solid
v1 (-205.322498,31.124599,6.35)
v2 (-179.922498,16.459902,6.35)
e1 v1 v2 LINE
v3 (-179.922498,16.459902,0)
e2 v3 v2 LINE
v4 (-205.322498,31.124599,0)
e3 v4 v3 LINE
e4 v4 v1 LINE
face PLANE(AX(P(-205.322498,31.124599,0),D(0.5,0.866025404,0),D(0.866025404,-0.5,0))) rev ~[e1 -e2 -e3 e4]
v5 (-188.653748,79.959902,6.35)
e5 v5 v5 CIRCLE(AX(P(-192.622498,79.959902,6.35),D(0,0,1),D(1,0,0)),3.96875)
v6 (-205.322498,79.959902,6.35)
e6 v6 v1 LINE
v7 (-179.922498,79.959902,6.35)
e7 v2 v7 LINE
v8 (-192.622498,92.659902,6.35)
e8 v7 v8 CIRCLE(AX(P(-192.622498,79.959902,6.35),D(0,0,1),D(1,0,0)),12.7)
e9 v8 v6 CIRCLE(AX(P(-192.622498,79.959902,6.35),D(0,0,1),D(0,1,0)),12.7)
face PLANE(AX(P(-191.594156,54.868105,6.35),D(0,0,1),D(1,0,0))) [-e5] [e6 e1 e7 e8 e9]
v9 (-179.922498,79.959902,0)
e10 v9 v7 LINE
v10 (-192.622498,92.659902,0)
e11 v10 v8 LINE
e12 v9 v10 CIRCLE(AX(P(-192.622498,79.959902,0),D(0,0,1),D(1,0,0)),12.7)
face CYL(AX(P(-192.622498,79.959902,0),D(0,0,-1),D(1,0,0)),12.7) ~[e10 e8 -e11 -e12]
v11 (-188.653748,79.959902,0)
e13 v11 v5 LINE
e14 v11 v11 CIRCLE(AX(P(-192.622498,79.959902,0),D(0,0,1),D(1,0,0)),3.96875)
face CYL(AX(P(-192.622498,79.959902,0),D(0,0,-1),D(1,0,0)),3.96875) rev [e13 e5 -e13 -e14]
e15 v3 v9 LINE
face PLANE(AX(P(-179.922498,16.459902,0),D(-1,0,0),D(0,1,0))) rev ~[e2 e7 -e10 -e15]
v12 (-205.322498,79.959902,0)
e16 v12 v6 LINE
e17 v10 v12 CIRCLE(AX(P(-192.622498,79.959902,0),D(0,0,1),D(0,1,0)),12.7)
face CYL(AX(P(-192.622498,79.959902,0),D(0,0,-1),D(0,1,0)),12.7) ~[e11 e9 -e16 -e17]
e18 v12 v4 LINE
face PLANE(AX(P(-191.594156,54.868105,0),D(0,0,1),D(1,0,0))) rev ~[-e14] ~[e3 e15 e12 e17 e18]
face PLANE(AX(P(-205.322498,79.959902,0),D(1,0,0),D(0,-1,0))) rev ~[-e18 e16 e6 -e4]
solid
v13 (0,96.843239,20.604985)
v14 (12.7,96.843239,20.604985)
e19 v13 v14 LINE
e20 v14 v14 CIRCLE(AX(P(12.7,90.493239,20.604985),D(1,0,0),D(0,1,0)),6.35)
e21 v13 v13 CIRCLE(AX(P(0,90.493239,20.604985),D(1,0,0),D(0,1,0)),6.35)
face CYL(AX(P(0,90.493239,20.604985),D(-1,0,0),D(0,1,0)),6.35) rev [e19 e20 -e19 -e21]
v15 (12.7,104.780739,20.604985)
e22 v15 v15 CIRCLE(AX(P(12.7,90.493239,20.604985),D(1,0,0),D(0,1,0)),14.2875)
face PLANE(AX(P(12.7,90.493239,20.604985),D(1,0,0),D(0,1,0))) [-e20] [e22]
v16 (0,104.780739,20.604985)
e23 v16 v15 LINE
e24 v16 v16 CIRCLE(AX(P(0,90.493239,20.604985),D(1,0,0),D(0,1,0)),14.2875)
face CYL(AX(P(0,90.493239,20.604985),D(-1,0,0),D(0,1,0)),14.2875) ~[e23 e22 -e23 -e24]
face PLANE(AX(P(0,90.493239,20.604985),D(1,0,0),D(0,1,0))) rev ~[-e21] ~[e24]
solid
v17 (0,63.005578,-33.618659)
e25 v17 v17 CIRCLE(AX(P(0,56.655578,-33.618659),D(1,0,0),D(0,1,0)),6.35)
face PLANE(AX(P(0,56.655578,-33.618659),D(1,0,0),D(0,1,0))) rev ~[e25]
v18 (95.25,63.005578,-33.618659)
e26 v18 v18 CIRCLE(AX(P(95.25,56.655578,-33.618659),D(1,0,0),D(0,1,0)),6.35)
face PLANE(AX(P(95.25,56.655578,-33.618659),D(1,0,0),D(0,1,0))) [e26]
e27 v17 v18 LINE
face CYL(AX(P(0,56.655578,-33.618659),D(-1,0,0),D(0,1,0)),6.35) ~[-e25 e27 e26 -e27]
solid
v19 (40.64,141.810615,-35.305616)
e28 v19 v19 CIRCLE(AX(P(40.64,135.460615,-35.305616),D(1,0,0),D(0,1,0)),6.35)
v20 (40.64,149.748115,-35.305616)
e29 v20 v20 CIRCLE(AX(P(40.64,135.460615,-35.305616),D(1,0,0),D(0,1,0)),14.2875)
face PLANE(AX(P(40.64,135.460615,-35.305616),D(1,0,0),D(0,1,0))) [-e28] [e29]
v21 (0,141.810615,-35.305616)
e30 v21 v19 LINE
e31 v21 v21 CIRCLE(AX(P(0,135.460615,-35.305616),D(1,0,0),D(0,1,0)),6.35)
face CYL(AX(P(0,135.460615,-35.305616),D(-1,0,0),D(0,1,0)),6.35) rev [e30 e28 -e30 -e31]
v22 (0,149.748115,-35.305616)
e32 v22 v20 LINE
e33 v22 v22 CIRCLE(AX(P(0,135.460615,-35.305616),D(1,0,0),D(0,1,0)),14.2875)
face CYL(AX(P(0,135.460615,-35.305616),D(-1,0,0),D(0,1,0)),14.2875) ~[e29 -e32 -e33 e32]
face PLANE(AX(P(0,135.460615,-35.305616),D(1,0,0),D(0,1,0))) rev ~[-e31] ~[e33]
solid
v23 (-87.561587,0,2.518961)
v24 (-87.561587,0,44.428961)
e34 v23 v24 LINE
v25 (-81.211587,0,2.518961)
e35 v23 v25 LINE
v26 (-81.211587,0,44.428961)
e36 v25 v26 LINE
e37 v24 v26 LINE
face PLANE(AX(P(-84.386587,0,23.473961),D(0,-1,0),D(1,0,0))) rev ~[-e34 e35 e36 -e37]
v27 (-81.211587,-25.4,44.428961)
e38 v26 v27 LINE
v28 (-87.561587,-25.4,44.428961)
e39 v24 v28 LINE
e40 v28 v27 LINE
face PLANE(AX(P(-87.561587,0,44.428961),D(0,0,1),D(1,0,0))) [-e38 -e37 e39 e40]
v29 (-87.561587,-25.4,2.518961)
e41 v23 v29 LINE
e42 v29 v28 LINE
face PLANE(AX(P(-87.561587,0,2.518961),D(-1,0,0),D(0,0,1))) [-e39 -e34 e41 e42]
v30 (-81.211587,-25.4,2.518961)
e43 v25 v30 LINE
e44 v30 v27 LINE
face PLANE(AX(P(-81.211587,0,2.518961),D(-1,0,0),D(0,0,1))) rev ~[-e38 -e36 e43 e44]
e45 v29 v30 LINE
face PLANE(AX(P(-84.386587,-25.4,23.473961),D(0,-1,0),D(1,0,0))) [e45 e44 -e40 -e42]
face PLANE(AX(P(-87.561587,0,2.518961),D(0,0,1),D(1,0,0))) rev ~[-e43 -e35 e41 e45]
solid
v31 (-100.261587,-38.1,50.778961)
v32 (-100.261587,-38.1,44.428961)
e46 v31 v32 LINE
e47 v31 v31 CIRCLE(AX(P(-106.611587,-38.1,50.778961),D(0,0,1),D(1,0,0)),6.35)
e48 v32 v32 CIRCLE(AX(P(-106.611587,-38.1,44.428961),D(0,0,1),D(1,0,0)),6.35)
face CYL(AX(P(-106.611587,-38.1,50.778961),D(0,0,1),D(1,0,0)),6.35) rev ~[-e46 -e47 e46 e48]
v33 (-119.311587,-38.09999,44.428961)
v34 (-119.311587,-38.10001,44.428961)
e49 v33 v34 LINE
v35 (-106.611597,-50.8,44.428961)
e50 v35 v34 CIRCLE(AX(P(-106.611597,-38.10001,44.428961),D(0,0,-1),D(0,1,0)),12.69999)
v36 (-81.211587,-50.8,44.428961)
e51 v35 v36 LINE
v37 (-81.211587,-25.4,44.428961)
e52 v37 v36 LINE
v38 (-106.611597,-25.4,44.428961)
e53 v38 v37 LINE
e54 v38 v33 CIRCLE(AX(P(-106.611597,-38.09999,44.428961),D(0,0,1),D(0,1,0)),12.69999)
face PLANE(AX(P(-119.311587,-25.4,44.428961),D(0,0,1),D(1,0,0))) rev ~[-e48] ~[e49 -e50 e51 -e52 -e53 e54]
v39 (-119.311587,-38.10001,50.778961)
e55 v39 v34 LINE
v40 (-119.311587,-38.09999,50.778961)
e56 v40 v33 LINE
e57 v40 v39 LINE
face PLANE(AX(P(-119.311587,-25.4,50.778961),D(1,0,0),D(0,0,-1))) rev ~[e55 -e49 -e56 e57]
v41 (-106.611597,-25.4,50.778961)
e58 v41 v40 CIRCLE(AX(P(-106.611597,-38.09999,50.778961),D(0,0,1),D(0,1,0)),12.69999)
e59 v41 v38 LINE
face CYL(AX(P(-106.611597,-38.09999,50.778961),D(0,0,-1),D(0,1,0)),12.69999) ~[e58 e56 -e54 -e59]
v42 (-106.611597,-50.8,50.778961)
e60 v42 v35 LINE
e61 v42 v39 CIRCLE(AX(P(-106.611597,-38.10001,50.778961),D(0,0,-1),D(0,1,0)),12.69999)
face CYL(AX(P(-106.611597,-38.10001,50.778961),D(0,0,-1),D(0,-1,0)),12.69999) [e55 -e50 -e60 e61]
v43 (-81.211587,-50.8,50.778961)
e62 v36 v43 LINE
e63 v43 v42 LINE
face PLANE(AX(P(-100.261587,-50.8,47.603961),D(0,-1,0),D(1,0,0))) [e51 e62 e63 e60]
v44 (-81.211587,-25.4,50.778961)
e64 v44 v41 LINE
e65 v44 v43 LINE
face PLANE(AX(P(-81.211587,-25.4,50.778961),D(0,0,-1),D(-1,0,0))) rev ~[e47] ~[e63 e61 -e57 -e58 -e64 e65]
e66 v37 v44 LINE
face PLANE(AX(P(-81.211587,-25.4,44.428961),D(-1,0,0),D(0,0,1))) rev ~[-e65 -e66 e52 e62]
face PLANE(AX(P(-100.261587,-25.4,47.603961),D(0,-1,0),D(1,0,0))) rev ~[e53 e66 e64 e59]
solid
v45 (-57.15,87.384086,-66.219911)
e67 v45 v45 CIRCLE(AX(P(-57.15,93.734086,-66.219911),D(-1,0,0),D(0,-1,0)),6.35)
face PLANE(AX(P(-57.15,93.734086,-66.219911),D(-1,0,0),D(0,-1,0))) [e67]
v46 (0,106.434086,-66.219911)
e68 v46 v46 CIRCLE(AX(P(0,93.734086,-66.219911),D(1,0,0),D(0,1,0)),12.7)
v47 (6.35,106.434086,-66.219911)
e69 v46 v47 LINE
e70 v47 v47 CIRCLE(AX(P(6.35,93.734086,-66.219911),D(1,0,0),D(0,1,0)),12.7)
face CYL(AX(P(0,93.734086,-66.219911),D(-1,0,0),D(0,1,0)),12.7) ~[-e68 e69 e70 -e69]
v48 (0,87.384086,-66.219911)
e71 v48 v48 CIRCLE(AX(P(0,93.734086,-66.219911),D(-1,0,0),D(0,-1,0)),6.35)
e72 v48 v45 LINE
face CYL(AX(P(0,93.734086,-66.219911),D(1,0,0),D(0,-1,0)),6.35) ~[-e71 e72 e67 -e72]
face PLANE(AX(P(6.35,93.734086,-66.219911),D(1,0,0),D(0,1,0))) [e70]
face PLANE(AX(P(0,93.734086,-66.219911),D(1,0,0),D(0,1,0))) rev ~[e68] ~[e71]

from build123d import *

# Parameters (mm, degrees)
F0_W      = 6.35
F0_H      = 41.91
F1_DEPTH  = 25.4
F3_DEPTH  = 25.4
F4_R      = 6.35
F5_DEPTH  = 6.35
F6_R      = 14.2875
F6_R_2    = 6.35
F7_DEPTH  = 12.7
F8_R      = 6.35
F9_DEPTH  = 95.25
F10_R     = 14.2875
F10_R_2   = 6.35
F11_DEPTH = 40.64
F12_R     = 12.7
F13_DEPTH = 6.35
F14_R     = 6.35
F15_DEPTH = 57.15
F16_R     = 3.96875
F17_DEPTH = 6.35
F18_R     = 12.69999


# Not quite as in the source:
# - a fillet or chamfer is up to 0.001 mm smaller than in the source, because OpenCascade refuses the exact size


with BuildPart() as f1:
    # F0 (on Front) → F1 (new body)
    with BuildSketch(Plane.XZ):
        with Locations((-84.3865873288, 23.4739605102)):
            Rectangle(F0_W, F0_H)
    extrude(amount=F1_DEPTH)


with BuildPart() as f3:
    # F2 (on face) → F3 (new body)
    with BuildSketch(Plane.XZ.offset(25.4)):
        Polygon((-87.5615873288, 44.4289605102), (-81.2115873288, 44.4289605102), (-81.2115873288, 50.7789605102), (-119.3115873288, 50.7789605102), (-119.3115873288, 44.4289605102), align=None)
    extrude(amount=F3_DEPTH)

    # F4 (on face) → F5 (cut, through all)
    with BuildSketch(Plane.XY.offset(50.7789605102)):
        with Locations((-106.6115873288, -38.1)):
            Circle(F4_R)
    extrude(amount=-F5_DEPTH, mode=Mode.SUBTRACT)

    # F18 (radius 12.7 in the source; OpenCascade refuses exactly that, so slightly less here)
    f18_edges = [f3.edges().sort_by_distance(p)[0] for p in [
        (-119.311587, -50.8, 47.603961),
        (-119.311587, -25.4, 47.603961),
    ]]
    fillet(f18_edges, radius=F18_R)


with BuildPart() as f7:
    # F6 (on Right) → F7 (new body)
    with BuildSketch(Plane.YZ):
        with Locations((90.4932394624, 20.6049848348)):
            Circle(F6_R)
        with Locations((90.4932394624, 20.6049848348)):
            Circle(F6_R_2, mode=Mode.SUBTRACT)
    extrude(amount=F7_DEPTH)


with BuildPart() as f9:
    # F8 (on Right) → F9 (new body)
    with BuildSketch(Plane.YZ):
        with Locations((56.6555783153, -33.6186587811)):
            Circle(F8_R)
    extrude(amount=F9_DEPTH)


with BuildPart() as f11:
    # F10 (on Right) → F11 (new body)
    with BuildSketch(Plane.YZ):
        with Locations((135.4606151581, -35.3056155145)):
            Circle(F10_R)
        with Locations((135.4606151581, -35.3056155145)):
            Circle(F10_R_2, mode=Mode.SUBTRACT)
    extrude(amount=F11_DEPTH)


with BuildPart() as f13:
    # F12 (on Right) → F13 (new body)
    with BuildSketch(Plane.YZ):
        with Locations((93.7340855598, -66.2199109793)):
            Circle(F12_R)
    extrude(amount=F13_DEPTH)

    # F14 (on face) → F15 (join)
    with BuildSketch(Plane(origin=(0, 0, 0), x_dir=(0, -1, 0), z_dir=(-1, 0, 0))):
        with Locations((-93.7340855598, -66.2199109793)):
            Circle(F14_R)
    extrude(amount=F15_DEPTH)


with BuildPart() as f17:
    # F16 (on Top) → F17 (new body)
    with BuildSketch(Plane.XY):
        with BuildLine():
            Line((-179.9224981273, 16.4599019216), (-179.9224981273, 79.9599019216))
            ThreePointArc((-179.9224981273, 79.9599019216), (-183.6422420062, 88.9401580427), (-192.6224981273, 92.6599019216))
            ThreePointArc((-192.6224981273, 92.6599019216), (-201.6027542484, 88.9401580427), (-205.3224981273, 79.9599019216))
            Line((-205.3224981273, 79.9599019216), (-205.3224981273, 31.124598759))
            Line((-205.3224981273, 31.124598759), (-179.9224981273, 16.4599019216))
        make_face()
        with Locations((-192.6224981273, 79.9599019216)):
            Circle(F16_R, mode=Mode.SUBTRACT)
    extrude(amount=F17_DEPTH)


solid = Compound([f1.part, f3.part, f7.part, f9.part, f11.part, f13.part, f17.part])
